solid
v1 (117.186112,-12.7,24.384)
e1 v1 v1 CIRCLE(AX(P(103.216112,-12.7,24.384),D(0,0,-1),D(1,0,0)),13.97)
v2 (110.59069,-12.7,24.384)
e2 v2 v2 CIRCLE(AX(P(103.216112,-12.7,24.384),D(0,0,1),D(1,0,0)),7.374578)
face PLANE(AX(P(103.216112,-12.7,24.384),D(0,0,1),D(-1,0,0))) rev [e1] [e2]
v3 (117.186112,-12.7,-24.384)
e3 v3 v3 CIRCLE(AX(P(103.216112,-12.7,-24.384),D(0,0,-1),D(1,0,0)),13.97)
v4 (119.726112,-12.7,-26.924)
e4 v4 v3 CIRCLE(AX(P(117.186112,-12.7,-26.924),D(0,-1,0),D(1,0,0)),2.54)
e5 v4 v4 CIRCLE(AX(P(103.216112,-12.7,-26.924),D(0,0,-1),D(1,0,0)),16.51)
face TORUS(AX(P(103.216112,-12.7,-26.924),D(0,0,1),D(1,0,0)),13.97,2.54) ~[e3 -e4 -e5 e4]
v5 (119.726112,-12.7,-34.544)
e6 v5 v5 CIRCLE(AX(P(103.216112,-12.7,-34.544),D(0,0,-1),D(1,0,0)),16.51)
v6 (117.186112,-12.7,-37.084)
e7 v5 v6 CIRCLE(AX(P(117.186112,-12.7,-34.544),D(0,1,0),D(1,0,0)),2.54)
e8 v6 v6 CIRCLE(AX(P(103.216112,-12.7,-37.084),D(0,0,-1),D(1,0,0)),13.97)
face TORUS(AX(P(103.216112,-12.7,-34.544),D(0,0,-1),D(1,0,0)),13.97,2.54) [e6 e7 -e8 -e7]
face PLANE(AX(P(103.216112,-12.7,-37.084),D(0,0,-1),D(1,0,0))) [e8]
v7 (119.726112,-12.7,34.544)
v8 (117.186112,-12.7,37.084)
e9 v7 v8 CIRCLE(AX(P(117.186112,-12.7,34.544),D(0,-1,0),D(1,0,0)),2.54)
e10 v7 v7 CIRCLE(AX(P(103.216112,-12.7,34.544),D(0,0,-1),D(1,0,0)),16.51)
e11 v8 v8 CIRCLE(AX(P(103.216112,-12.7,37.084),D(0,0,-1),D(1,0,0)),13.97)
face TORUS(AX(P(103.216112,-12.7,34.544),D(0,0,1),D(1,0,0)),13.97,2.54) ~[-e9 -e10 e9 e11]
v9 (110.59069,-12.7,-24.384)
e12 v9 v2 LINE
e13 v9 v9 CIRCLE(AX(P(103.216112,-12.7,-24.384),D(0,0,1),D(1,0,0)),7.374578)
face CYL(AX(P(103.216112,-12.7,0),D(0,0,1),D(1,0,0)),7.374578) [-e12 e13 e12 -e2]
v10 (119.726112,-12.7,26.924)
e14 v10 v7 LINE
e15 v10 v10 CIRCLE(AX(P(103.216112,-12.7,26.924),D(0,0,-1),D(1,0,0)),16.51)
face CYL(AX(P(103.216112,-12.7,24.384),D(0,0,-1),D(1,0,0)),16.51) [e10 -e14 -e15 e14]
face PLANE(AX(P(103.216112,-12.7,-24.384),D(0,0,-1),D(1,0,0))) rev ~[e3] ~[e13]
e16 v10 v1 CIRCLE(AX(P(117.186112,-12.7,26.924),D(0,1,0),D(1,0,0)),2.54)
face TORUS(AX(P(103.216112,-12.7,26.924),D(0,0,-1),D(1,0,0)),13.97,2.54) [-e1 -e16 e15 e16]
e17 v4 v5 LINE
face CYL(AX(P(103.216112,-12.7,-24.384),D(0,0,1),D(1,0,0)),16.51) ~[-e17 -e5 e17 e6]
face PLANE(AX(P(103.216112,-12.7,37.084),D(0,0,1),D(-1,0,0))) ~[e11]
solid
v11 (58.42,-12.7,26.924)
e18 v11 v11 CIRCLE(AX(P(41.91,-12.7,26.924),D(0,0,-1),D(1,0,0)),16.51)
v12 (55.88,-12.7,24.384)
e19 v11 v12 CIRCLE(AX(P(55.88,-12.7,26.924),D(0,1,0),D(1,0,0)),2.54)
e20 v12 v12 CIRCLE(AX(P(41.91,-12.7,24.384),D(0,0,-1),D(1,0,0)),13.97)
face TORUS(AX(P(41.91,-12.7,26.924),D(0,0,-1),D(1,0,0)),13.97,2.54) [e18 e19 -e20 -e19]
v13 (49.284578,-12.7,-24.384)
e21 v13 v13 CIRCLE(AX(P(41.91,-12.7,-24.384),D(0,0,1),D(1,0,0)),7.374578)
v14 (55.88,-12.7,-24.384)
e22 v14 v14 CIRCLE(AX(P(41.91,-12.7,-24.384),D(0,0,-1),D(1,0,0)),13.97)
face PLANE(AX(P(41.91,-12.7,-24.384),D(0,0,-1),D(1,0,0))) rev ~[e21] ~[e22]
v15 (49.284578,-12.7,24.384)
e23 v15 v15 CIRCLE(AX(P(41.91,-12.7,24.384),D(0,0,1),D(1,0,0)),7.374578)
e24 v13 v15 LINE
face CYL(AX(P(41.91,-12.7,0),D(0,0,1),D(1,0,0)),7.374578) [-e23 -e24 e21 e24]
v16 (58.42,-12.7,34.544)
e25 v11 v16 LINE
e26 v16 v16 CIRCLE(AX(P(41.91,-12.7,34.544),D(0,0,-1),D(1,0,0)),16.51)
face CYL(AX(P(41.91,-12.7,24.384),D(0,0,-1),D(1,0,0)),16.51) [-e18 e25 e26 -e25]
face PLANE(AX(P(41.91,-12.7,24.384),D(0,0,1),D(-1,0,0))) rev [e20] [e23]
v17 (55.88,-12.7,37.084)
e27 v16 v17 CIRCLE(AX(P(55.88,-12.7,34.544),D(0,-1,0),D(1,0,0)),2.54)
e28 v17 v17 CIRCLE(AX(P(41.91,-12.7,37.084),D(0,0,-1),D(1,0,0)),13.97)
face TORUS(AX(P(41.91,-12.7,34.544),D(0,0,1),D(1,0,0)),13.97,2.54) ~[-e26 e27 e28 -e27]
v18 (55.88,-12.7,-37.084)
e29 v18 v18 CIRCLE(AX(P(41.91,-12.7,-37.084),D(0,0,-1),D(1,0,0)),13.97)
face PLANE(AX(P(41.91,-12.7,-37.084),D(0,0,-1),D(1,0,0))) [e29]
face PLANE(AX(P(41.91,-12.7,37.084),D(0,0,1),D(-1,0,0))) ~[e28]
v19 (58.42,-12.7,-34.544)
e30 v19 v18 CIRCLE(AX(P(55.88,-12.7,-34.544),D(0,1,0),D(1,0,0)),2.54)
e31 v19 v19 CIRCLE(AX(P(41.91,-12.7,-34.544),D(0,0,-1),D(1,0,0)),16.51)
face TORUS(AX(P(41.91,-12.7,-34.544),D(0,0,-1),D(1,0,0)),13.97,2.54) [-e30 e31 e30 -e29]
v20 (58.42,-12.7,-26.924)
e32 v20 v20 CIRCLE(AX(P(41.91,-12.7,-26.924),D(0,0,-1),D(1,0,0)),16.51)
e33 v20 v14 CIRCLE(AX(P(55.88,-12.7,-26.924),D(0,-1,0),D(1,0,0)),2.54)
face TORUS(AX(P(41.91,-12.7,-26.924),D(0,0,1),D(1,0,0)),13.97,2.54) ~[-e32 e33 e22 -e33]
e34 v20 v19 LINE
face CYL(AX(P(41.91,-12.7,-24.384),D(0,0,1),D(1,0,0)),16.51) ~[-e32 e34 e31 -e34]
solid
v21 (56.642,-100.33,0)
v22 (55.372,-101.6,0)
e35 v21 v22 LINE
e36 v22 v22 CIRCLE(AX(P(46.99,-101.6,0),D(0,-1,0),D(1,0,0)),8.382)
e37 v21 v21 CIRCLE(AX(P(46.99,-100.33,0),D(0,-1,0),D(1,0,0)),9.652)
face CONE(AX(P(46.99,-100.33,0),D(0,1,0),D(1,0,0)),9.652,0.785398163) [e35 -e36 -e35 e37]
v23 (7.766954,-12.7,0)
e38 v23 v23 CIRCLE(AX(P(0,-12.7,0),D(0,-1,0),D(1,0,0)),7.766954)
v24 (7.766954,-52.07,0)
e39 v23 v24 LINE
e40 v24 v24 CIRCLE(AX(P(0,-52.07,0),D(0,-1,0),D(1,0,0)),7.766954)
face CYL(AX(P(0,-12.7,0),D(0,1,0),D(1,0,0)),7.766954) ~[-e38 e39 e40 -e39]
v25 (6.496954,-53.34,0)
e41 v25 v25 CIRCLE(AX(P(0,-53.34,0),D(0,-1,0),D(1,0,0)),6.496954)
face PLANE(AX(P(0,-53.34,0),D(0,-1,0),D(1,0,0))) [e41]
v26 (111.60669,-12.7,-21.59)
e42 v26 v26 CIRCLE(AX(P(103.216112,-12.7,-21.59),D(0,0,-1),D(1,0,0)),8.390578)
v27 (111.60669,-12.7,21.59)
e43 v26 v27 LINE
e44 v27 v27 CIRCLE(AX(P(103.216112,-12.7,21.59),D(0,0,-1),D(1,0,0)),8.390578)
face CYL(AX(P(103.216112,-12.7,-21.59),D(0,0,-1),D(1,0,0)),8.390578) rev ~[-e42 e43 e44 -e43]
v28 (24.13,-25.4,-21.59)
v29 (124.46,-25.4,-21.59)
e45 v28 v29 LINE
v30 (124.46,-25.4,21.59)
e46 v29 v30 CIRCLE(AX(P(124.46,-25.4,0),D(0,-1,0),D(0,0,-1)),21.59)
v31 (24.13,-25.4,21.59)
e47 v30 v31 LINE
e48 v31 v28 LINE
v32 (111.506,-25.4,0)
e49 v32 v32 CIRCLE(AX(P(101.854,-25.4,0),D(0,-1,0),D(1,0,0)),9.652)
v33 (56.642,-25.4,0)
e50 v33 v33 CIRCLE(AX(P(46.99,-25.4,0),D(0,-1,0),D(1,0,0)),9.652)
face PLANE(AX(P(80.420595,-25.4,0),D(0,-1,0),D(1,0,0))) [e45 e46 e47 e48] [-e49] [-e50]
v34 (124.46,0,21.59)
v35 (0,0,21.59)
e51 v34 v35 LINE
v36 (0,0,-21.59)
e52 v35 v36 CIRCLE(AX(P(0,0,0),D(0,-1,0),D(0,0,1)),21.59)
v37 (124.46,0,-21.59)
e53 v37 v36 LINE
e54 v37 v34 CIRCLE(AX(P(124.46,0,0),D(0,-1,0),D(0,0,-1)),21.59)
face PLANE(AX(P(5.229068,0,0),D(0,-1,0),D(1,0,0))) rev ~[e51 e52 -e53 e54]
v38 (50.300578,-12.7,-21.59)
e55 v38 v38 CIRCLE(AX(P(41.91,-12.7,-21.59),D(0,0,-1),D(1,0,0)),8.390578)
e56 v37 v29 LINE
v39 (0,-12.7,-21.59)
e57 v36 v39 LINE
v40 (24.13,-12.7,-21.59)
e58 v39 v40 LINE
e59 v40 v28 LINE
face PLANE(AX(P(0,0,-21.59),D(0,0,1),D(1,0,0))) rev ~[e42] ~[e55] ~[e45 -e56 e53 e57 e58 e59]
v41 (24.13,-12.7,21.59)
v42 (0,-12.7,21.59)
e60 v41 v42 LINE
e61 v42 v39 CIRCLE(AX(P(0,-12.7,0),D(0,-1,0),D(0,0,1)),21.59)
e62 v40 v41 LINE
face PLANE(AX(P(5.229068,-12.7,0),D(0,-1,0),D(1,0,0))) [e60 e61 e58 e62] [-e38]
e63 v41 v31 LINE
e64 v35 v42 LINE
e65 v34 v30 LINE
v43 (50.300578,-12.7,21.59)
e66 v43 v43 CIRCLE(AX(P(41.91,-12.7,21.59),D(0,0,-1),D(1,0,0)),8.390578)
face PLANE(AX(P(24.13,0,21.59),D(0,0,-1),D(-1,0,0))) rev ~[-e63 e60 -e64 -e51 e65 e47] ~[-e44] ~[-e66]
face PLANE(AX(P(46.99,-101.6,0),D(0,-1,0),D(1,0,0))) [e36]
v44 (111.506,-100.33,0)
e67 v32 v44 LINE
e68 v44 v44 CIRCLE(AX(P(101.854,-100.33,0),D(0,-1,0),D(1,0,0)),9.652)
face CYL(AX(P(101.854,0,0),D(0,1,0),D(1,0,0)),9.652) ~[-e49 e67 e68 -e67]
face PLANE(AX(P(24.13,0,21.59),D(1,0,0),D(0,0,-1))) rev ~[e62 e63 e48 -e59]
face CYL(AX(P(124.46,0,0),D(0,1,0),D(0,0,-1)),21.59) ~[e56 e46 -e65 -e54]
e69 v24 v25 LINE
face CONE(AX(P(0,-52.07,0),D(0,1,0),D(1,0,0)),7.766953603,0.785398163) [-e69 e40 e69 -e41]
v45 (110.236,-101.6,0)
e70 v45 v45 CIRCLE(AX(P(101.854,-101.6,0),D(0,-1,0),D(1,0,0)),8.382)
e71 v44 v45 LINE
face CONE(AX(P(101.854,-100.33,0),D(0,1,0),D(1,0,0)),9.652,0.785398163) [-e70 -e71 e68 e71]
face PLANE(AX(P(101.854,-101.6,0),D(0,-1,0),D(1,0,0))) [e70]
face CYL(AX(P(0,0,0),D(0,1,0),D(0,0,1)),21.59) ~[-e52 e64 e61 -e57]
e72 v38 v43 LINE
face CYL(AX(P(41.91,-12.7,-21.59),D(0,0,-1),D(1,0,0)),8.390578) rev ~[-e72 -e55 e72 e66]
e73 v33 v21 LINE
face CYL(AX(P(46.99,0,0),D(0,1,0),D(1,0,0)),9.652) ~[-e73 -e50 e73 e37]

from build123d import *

# Parameters (mm, degrees)
F0_R      = 9.652
F1_DEPTH  = 25.4
F2_DEPTH  = 12.7
F3_DEPTH  = 101.6
F5_R      = 7.7669536028
F6_DEPTH  = 40.64
F4_R      = 8.3905783295
F7_DEPTH  = 43.181
F8_R      = 7.3745783295
F9_DEPTH  = 24.384
F10_R     = 16.51
F10_R_2   = 7.3745783295
F11_DEPTH = 12.7
F12_R     = 2.54
F12_2_R   = 2.54
F14_SIZE  = 1.27


# Not quite as in the source:
# - a feature names something its author has since deleted; it is built from what else it names


with BuildPart() as f1:
    # F0 (on Front) → F1 (new body)
    with BuildSketch(Plane.XZ):
        with BuildLine():
            Line((124.46, 21.59), (24.13, 21.59))
            Line((24.13, 21.59), (24.13, -21.59))
            Line((24.13, -21.59), (124.46, -21.59))
            ThreePointArc((124.46, -21.59), (146.05, 0), (124.46, 21.59))
        make_face()
        with Locations((46.99, 0)):
            Circle(F0_R, mode=Mode.SUBTRACT)
        with Locations((101.854, 0)):
            Circle(F0_R, mode=Mode.SUBTRACT)
    extrude(amount=F1_DEPTH)

    # F0 (on Front) → F2 (join)
    with BuildSketch(Plane.XZ):
        with BuildLine():
            Line((24.13, 21.59), (0, 21.59))
            ThreePointArc((0, 21.59), (-21.59, 0), (0, -21.59))
            Line((0, -21.59), (24.13, -21.59))
            Line((24.13, -21.59), (24.13, 21.59))
        make_face()
    extrude(amount=F2_DEPTH)

    # F0 (on Front) → F3 (join)
    with BuildSketch(Plane.XZ):
        with Locations((46.99, 0)):
            Circle(F0_R)
        with Locations((101.854, 0)):
            Circle(F0_R)
    extrude(amount=F3_DEPTH)

    # F5 (on face) → F6 (join)
    with BuildSketch(Plane.XZ.offset(12.7)):
        Circle(F5_R)
    extrude(amount=F6_DEPTH)

    # F4 (on face) → F7 (cut, through all)
    with BuildSketch(Plane(origin=(0, 0, -21.59), x_dir=(1, 0, 0), z_dir=(0, 0, -1))):
        with Locations((103.21611166, 12.7)):
            Circle(F4_R)
        with Locations((41.91, 12.7)):
            Circle(F4_R)
    extrude(amount=-F7_DEPTH, mode=Mode.SUBTRACT)

    # F14
    f14_edges = [f1.edges().sort_by_distance(p)[0] for p in [
        (92.202, -101.6, 0),
        (37.338, -101.6, 0),
        (-7.766954, -53.34, 0),
    ]]
    chamfer(f14_edges, length=F14_SIZE)


with BuildPart() as f9:
    # F8 (on Top) → F9 (new body, symmetric)
    with BuildSketch(Plane.XY):
        with Locations((41.91, -12.7)):
            Circle(F8_R)
    extrude(amount=F9_DEPTH, both=True)



with BuildPart() as f9b:
    # F8 (on Top) → F9, piece 2 (new body, symmetric)
    with BuildSketch(Plane.XY):
        with Locations((103.21611166, -12.7)):
            Circle(F8_R)
    extrude(amount=F9_DEPTH, both=True)


with BuildPart() as f11:
    # F10 (on face) → F11 (new body)
    with BuildSketch(Plane(origin=(0, 0, -24.384), x_dir=(1, 0, 0), z_dir=(0, 0, -1))):
        with Locations((41.91, 12.7)):
            Circle(F10_R)
        with Locations((41.91, 12.7)):
            Circle(F10_R_2, mode=Mode.SUBTRACT)
        with Locations((41.91, 12.7)):
            Circle(F10_R_2)
    extrude(amount=F11_DEPTH)

    # F12
    f12_edges = [f11.edges().sort_by_distance(p)[0] for p in [
        (25.4, -12.7, -37.084),
        (25.4, -12.7, -24.384),
    ]]
    fillet(f12_edges, radius=F12_R)


with BuildPart() as f11b:
    # F10 (on face) → F11, piece 2 (new body)
    with BuildSketch(Plane(origin=(0, 0, -24.384), x_dir=(1, 0, 0), z_dir=(0, 0, -1))):
        with Locations((103.21611166, 12.7)):
            Circle(F10_R)
    extrude(amount=F11_DEPTH)

    # F12#2
    f12_2_edges = [f11b.edges().sort_by_distance(p)[0] for p in [
        (86.706112, -12.7, -37.084),
        (86.706112, -12.7, -24.384),
    ]]
    fillet(f12_2_edges, radius=F12_2_R)


with BuildPart() as f9_1:
    add(f9.part)

    add(f9b.part)  # F13 merges F9b

    add(f11.part)  # F13 merges F11

    add(f11b.part)  # F13 merges F11b
    # F13: F9, F11, F11b, F9b across plane
    add(f9.part.mirror(Plane.XY))
    add(f11.part.mirror(Plane.XY))
    add(f11b.part.mirror(Plane.XY))
    add(f9b.part.mirror(Plane.XY))


solid = Compound([f1.part, f9_1.part])
